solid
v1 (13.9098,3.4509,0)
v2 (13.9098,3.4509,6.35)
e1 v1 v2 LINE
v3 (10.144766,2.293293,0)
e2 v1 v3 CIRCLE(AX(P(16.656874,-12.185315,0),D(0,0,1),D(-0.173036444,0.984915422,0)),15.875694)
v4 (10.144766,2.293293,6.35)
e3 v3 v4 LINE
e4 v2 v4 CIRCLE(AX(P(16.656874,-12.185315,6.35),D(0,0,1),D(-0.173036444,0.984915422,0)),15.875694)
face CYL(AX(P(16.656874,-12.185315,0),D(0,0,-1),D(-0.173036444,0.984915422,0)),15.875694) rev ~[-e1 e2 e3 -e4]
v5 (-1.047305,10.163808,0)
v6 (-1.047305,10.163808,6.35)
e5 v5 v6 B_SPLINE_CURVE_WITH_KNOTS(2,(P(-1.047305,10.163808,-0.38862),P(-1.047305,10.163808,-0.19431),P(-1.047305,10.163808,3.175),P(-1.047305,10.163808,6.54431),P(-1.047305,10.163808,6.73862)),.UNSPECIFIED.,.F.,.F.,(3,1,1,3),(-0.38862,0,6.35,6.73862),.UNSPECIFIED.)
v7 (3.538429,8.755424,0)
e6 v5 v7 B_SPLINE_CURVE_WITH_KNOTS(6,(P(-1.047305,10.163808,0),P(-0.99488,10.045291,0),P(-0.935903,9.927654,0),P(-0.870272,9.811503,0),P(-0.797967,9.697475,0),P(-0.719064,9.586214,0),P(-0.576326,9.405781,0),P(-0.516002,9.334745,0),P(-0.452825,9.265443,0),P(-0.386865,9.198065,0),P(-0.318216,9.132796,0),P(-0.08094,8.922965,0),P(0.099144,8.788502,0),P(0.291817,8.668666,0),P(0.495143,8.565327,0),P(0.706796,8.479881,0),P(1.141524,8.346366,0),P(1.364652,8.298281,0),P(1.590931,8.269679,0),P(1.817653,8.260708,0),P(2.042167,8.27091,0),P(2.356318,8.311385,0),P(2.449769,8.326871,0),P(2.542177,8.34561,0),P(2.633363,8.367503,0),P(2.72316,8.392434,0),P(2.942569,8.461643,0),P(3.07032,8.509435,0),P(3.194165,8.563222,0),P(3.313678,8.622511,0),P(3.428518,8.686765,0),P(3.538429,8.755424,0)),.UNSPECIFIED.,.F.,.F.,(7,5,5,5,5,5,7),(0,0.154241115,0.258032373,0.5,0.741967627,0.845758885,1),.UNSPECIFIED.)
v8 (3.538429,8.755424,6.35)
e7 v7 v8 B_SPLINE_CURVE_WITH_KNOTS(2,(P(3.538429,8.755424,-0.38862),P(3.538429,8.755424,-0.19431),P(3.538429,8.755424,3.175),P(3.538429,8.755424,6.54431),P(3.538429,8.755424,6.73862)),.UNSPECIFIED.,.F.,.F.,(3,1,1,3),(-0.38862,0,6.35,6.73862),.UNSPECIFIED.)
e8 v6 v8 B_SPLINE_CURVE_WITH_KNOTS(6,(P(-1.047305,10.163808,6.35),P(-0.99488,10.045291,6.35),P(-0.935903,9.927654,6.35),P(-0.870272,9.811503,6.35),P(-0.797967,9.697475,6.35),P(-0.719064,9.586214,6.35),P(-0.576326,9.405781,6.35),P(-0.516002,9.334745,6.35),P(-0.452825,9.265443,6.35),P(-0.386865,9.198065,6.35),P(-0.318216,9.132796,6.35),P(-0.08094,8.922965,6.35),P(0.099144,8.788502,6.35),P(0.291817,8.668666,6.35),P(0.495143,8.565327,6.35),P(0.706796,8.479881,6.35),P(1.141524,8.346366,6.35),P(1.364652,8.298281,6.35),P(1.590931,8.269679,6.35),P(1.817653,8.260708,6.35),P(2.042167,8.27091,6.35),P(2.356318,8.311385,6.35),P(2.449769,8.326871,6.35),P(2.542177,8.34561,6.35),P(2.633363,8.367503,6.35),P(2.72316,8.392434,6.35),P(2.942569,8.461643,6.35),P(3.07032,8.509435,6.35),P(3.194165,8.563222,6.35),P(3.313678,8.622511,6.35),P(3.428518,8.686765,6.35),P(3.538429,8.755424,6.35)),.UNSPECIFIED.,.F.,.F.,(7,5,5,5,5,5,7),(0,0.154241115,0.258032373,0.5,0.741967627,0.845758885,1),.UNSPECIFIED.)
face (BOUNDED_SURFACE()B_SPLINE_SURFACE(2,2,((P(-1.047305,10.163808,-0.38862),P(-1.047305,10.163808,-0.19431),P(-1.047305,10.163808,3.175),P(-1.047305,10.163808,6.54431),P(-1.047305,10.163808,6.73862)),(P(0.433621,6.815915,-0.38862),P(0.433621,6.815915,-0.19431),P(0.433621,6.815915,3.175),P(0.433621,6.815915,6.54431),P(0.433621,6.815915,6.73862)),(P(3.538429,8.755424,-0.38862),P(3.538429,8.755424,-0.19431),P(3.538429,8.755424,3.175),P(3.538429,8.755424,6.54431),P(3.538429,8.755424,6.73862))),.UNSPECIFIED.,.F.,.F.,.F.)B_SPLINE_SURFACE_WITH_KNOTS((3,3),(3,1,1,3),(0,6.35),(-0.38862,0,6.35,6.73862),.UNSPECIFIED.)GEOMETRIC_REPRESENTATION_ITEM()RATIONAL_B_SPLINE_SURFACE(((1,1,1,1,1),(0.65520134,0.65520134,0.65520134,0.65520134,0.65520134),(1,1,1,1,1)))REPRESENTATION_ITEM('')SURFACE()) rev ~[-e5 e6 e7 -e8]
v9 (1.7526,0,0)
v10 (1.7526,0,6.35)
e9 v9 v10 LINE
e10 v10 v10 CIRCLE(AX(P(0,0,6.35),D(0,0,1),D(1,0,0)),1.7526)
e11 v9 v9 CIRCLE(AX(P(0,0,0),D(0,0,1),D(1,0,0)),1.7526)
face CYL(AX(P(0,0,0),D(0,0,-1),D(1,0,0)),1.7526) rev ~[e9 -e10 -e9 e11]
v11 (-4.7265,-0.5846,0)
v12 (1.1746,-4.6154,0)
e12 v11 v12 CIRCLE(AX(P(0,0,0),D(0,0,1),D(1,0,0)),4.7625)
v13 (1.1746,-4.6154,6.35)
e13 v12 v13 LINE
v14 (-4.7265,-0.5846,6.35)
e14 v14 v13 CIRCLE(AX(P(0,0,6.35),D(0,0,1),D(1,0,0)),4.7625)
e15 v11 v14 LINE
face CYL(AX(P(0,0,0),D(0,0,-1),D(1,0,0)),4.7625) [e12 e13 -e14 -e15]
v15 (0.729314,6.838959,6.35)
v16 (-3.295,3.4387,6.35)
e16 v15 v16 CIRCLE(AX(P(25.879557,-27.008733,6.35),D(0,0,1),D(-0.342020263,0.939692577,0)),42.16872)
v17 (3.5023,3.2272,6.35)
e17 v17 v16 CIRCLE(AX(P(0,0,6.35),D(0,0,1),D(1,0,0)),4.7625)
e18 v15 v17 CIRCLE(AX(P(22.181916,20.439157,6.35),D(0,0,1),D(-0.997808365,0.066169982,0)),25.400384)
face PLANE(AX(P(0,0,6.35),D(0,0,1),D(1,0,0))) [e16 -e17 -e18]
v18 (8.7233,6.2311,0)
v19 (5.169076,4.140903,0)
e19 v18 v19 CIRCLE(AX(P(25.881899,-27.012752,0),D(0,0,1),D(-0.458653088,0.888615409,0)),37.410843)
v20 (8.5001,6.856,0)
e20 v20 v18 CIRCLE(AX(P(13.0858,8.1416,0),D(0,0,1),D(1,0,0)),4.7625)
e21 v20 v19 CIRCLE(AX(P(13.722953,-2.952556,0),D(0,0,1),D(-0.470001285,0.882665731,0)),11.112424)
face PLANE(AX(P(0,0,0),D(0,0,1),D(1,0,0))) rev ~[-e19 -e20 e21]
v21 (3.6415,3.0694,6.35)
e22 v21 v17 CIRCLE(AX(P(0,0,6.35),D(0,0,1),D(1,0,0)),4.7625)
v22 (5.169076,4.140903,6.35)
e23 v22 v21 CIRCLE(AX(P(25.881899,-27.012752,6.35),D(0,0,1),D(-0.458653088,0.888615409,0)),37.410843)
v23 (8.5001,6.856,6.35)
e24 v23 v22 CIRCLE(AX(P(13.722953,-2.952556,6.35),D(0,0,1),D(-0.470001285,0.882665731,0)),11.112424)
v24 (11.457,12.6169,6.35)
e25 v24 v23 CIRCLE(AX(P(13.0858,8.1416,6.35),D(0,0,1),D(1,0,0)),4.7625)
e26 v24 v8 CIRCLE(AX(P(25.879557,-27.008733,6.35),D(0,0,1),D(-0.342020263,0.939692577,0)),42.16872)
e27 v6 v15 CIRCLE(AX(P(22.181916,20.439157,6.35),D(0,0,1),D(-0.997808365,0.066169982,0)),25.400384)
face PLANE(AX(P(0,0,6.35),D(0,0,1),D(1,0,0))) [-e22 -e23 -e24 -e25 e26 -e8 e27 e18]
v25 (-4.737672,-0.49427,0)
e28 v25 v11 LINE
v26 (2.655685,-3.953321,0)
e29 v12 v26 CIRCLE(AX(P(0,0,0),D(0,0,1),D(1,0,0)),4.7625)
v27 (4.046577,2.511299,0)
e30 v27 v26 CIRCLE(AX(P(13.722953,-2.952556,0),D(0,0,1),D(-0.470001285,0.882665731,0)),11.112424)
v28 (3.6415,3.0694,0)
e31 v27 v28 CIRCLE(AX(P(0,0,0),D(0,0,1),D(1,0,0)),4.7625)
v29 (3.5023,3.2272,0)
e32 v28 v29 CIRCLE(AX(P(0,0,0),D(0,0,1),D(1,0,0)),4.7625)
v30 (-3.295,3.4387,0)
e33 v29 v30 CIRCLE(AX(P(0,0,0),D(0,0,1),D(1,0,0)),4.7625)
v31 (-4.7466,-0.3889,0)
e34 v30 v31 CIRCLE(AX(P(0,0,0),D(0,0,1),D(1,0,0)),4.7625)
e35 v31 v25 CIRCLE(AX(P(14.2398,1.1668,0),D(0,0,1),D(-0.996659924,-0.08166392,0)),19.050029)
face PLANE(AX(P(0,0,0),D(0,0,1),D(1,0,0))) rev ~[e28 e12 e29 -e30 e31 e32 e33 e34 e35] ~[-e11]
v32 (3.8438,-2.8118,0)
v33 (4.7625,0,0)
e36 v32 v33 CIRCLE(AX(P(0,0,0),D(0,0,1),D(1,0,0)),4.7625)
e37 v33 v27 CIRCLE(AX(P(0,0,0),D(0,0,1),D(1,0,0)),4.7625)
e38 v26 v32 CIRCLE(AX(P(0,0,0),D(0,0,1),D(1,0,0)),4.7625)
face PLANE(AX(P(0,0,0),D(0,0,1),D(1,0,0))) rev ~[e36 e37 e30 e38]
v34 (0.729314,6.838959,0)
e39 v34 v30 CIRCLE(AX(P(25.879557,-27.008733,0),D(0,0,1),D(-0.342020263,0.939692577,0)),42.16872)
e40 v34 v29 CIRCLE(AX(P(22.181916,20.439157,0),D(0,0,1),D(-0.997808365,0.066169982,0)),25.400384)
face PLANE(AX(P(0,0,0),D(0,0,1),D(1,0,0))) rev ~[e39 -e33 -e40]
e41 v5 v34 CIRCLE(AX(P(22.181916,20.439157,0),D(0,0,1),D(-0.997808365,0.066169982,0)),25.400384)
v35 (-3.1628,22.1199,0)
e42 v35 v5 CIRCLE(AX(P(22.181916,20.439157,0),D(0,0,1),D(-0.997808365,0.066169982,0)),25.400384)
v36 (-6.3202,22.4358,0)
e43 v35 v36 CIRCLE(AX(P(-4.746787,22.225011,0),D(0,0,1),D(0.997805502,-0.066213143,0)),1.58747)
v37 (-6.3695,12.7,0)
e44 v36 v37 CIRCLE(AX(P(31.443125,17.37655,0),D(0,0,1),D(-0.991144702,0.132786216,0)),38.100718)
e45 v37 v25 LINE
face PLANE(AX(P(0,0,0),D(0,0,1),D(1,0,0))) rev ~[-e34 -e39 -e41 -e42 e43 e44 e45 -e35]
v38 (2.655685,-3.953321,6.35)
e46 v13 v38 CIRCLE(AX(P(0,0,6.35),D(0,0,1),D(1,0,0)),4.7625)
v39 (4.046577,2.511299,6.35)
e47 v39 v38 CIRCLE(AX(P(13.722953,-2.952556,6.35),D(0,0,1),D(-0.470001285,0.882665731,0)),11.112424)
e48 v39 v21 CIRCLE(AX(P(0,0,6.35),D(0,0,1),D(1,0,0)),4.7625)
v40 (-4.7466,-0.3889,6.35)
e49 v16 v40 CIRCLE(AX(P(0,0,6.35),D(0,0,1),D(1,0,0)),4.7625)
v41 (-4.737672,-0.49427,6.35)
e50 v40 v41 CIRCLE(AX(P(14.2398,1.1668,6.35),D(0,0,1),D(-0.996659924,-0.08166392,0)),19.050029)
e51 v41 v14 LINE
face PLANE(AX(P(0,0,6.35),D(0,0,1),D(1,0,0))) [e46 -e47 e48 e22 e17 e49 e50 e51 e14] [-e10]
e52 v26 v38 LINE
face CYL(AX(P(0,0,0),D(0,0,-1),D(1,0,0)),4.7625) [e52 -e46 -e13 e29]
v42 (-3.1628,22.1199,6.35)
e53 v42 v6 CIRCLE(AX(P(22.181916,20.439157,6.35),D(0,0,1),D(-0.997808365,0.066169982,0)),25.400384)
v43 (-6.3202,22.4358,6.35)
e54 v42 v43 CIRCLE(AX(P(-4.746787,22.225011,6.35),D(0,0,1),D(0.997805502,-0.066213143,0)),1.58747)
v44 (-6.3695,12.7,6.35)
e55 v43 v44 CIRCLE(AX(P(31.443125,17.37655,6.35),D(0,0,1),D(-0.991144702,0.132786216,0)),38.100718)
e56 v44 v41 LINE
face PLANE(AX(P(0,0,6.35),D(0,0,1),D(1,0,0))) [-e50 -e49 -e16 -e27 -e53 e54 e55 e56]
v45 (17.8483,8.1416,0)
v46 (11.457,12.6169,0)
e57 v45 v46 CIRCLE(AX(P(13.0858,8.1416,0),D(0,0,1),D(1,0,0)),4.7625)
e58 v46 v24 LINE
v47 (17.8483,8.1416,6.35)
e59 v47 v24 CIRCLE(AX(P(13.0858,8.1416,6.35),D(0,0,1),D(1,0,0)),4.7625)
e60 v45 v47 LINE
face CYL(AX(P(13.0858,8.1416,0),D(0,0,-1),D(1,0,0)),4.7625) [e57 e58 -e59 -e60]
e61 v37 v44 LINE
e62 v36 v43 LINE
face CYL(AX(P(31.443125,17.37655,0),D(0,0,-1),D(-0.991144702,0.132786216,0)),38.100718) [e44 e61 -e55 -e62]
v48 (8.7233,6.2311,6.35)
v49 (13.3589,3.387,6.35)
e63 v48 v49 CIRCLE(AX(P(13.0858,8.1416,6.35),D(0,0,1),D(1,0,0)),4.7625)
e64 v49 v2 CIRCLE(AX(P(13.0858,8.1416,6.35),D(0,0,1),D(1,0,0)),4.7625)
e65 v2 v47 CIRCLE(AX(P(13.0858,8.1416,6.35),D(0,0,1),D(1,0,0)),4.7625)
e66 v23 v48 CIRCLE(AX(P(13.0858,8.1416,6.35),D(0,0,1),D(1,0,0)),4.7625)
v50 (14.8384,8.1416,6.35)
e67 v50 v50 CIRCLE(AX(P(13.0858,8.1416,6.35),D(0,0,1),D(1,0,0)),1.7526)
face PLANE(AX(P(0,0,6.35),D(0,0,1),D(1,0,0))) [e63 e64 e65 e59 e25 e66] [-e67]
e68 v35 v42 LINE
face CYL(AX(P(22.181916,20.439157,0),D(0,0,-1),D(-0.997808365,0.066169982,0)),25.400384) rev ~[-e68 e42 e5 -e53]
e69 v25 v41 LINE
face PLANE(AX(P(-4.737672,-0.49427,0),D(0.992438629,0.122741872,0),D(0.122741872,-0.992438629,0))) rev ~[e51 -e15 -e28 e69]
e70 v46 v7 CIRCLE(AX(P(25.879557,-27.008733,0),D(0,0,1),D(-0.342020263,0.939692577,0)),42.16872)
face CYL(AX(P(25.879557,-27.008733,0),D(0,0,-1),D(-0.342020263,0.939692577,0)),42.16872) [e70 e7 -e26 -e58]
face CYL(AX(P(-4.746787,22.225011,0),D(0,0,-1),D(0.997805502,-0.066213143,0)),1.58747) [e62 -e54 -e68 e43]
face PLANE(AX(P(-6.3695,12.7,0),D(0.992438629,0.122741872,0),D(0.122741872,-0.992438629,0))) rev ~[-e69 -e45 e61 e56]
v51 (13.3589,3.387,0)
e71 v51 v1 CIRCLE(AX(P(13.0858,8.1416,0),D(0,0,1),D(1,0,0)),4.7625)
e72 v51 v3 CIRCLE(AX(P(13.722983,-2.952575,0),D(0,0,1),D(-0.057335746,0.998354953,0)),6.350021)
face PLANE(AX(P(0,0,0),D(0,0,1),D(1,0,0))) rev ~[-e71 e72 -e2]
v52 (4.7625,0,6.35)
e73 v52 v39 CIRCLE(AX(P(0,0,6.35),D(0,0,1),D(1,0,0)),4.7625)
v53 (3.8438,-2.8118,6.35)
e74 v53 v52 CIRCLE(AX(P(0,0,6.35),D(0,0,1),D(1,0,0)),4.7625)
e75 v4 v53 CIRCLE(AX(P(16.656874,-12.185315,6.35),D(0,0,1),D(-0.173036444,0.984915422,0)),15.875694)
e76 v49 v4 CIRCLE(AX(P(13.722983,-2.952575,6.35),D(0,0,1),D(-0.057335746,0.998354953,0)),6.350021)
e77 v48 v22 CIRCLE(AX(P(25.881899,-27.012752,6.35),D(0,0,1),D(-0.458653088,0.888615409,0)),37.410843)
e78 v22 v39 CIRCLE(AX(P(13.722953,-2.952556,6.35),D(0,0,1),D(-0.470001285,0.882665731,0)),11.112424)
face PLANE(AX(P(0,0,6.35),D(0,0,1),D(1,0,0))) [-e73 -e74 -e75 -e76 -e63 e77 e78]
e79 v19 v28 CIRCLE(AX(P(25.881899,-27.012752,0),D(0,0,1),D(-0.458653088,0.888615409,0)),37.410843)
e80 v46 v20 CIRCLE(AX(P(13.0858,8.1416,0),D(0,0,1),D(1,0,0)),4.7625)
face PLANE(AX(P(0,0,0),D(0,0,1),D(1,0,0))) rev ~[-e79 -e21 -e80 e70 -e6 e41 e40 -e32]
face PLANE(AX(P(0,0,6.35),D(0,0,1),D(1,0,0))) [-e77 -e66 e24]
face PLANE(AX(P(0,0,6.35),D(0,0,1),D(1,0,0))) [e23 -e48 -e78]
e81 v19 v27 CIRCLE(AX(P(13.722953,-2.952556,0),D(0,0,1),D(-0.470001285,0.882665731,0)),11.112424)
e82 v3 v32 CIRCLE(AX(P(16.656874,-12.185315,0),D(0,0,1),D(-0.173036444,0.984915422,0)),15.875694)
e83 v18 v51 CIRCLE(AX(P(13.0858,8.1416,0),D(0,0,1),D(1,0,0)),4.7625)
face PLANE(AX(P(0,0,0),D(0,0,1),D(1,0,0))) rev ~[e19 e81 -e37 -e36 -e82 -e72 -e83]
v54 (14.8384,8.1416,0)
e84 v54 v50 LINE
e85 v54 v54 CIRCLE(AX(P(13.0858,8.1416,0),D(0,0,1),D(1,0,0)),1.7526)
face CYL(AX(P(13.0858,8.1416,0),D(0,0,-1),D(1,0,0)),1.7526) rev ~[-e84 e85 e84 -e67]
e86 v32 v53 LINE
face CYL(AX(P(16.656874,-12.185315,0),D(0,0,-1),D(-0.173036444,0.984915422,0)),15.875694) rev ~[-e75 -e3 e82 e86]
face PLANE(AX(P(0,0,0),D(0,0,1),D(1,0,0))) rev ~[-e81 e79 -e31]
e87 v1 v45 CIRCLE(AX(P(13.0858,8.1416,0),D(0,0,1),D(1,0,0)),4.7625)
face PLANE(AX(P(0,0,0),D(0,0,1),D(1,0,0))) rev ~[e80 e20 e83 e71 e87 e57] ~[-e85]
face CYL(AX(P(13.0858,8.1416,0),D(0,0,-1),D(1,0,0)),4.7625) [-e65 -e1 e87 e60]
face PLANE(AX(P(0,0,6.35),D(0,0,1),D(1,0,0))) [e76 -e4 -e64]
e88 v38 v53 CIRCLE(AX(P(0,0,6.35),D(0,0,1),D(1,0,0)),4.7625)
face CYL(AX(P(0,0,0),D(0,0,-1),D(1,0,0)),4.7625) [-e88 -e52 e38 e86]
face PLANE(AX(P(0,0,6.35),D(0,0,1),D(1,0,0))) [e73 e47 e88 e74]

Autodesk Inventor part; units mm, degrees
ref_plane "YZ Plane" through (0, 0, 0) normal (1, 0, 0) x (0, 1, 0)
ref_plane "XZ Plane" through (0, 0, 0) normal (0, 1, 0) x (-1, 0, 0)
ref_plane "XY Plane" through (0, 0, 0) normal (0, 0, 1) x (1, 0, 0)
sketch "Sketch1" plane through (0, 0, 0) normal (0, 0, 1) x (1, 0, 0)
  circle A0 centre (0, 0) radius 1.7526
  circle A1 centre (0, 0) radius 4.7625
  circle A2 centre (0, 0) radius 19.05 construction
  circle A3 centre (0, 19.05) radius 3.175 construction
  line L0 (0, 19.05) -> (0, 0) construction
  line L1 (0, 19.05) -> (3.175, 19.05) construction
  arc A4 (-3.1628, 22.1199) -> (-6.3202, 22.4358) centre (-4.7468, 22.225) ccw
  arc A5 (-6.3202, 22.4358) -> (-6.3695, 12.7) centre (31.4424, 17.3766) ccw
  line L2 (-6.3695, 12.7) -> (-4.7265, -0.5846)
  circle A6 centre (13.0858, 8.1416) radius 6.35 construction
  line L3 (7.1188, 5.9698) -> (13.0858, 8.1416) construction
  line L4 (0, 0) -> (-3.1615, 8.6862) construction
  circle A7 centre (13.0858, 8.1416) radius 1.7526
  circle A8 centre (13.0858, 8.1416) radius 4.7625
  arc A9 (-3.1628, 22.1199) -> (3.5023, 3.2272) centre (22.1815, 20.4391) ccw
  arc A10 (11.457, 12.6169) -> (-3.295, 3.4387) centre (25.8792, -27.008) ccw
  line L5 (11.457, 12.6169) -> (7.5101, 11.1804) construction
  arc A11 (13.9098, 3.4509) -> (3.8438, -2.8118) centre (16.6566, -12.1846) ccw
  circle A12 centre (4.7625, -9.525) radius 6.35 construction
  circle A13 centre (4.7625, -9.525) radius 1.7526
  circle A14 centre (4.7625, -9.525) radius 4.7625
  arc A15 (13.3589, 3.387) -> (8.6027, -6.7083) centre (13.723, -2.9526) ccw
  arc A16 (-4.7466, -0.3889) -> (1.6034, -13.0889) centre (14.2398, 1.1668) ccw
  arc A17 (8.5001, 6.856) -> (2.8341, -5.1704) centre (13.723, -2.9526) ccw
  arc A18 (1.1746, -4.6154) -> (1.7749, -5.8161) centre (14.2398, 1.1668) ccw
  arc A19 (8.7233, 6.2311) -> (3.6415, 3.0694) centre (25.8792, -27.008) ccw
  circle A20 centre (0, 0) radius 3.175 construction
  point P0 (3.7177, 2.9766)
  point P1 (0.7293, 6.839)
  point P2 (2.6557, -3.9533)
  point P3 (-4.7377, -0.494)
  dimension "d1" = 9.525
  dimension "d2" = 38.1
  dimension "d3" = 6.35
  dimension "d0" = 3.5052
  dimension "d5" = 3.175
  dimension "d6" = 3.175
  dimension "d7" = 38.1
  dimension "d8" = 6.35
  dimension "d11" = 12.7
  dimension "d12" = 3.5052
  dimension "d13" = 15.0813
  dimension "d14" = 3.175
  dimension "d16" = 9.525
  dimension "d18" = 25.4
  dimension "d19" = 15.875
  dimension "d21" = 12.7
  dimension "d22" = 3.5052
  dimension "d23" = 9.525
  dimension "d24" = 4.7625
  dimension "d25" = 9.525
  dimension "d26" = 6.35
  dimension "d27" = 4.7625
  dimension "d28" = 4.7625
  dimension "d29" = 4.7625
  dimension "d31" = 19.05
  dimension "d32" = 20
  dimension "d33" = 6.35
extrude "Extrusion1" add sketch "Sketch1" along normal blind 6.35 contours A1 A17 | A19 A17 A1 | A1 A9 A10 A8 A17 A19 | A1 A10 A9 | A17 A19 A8 A15 A11 A1 | A1 A17 | A17 A8 A19 | A1 L2 A5 A4 A9 A10 | A8 | A8 A11 A15
fillet "Fillet1" radius 3.175 1 edges at (0.7293, 6.839, 3.175)
properties part number "Lever" material "Aluminum 6061"
